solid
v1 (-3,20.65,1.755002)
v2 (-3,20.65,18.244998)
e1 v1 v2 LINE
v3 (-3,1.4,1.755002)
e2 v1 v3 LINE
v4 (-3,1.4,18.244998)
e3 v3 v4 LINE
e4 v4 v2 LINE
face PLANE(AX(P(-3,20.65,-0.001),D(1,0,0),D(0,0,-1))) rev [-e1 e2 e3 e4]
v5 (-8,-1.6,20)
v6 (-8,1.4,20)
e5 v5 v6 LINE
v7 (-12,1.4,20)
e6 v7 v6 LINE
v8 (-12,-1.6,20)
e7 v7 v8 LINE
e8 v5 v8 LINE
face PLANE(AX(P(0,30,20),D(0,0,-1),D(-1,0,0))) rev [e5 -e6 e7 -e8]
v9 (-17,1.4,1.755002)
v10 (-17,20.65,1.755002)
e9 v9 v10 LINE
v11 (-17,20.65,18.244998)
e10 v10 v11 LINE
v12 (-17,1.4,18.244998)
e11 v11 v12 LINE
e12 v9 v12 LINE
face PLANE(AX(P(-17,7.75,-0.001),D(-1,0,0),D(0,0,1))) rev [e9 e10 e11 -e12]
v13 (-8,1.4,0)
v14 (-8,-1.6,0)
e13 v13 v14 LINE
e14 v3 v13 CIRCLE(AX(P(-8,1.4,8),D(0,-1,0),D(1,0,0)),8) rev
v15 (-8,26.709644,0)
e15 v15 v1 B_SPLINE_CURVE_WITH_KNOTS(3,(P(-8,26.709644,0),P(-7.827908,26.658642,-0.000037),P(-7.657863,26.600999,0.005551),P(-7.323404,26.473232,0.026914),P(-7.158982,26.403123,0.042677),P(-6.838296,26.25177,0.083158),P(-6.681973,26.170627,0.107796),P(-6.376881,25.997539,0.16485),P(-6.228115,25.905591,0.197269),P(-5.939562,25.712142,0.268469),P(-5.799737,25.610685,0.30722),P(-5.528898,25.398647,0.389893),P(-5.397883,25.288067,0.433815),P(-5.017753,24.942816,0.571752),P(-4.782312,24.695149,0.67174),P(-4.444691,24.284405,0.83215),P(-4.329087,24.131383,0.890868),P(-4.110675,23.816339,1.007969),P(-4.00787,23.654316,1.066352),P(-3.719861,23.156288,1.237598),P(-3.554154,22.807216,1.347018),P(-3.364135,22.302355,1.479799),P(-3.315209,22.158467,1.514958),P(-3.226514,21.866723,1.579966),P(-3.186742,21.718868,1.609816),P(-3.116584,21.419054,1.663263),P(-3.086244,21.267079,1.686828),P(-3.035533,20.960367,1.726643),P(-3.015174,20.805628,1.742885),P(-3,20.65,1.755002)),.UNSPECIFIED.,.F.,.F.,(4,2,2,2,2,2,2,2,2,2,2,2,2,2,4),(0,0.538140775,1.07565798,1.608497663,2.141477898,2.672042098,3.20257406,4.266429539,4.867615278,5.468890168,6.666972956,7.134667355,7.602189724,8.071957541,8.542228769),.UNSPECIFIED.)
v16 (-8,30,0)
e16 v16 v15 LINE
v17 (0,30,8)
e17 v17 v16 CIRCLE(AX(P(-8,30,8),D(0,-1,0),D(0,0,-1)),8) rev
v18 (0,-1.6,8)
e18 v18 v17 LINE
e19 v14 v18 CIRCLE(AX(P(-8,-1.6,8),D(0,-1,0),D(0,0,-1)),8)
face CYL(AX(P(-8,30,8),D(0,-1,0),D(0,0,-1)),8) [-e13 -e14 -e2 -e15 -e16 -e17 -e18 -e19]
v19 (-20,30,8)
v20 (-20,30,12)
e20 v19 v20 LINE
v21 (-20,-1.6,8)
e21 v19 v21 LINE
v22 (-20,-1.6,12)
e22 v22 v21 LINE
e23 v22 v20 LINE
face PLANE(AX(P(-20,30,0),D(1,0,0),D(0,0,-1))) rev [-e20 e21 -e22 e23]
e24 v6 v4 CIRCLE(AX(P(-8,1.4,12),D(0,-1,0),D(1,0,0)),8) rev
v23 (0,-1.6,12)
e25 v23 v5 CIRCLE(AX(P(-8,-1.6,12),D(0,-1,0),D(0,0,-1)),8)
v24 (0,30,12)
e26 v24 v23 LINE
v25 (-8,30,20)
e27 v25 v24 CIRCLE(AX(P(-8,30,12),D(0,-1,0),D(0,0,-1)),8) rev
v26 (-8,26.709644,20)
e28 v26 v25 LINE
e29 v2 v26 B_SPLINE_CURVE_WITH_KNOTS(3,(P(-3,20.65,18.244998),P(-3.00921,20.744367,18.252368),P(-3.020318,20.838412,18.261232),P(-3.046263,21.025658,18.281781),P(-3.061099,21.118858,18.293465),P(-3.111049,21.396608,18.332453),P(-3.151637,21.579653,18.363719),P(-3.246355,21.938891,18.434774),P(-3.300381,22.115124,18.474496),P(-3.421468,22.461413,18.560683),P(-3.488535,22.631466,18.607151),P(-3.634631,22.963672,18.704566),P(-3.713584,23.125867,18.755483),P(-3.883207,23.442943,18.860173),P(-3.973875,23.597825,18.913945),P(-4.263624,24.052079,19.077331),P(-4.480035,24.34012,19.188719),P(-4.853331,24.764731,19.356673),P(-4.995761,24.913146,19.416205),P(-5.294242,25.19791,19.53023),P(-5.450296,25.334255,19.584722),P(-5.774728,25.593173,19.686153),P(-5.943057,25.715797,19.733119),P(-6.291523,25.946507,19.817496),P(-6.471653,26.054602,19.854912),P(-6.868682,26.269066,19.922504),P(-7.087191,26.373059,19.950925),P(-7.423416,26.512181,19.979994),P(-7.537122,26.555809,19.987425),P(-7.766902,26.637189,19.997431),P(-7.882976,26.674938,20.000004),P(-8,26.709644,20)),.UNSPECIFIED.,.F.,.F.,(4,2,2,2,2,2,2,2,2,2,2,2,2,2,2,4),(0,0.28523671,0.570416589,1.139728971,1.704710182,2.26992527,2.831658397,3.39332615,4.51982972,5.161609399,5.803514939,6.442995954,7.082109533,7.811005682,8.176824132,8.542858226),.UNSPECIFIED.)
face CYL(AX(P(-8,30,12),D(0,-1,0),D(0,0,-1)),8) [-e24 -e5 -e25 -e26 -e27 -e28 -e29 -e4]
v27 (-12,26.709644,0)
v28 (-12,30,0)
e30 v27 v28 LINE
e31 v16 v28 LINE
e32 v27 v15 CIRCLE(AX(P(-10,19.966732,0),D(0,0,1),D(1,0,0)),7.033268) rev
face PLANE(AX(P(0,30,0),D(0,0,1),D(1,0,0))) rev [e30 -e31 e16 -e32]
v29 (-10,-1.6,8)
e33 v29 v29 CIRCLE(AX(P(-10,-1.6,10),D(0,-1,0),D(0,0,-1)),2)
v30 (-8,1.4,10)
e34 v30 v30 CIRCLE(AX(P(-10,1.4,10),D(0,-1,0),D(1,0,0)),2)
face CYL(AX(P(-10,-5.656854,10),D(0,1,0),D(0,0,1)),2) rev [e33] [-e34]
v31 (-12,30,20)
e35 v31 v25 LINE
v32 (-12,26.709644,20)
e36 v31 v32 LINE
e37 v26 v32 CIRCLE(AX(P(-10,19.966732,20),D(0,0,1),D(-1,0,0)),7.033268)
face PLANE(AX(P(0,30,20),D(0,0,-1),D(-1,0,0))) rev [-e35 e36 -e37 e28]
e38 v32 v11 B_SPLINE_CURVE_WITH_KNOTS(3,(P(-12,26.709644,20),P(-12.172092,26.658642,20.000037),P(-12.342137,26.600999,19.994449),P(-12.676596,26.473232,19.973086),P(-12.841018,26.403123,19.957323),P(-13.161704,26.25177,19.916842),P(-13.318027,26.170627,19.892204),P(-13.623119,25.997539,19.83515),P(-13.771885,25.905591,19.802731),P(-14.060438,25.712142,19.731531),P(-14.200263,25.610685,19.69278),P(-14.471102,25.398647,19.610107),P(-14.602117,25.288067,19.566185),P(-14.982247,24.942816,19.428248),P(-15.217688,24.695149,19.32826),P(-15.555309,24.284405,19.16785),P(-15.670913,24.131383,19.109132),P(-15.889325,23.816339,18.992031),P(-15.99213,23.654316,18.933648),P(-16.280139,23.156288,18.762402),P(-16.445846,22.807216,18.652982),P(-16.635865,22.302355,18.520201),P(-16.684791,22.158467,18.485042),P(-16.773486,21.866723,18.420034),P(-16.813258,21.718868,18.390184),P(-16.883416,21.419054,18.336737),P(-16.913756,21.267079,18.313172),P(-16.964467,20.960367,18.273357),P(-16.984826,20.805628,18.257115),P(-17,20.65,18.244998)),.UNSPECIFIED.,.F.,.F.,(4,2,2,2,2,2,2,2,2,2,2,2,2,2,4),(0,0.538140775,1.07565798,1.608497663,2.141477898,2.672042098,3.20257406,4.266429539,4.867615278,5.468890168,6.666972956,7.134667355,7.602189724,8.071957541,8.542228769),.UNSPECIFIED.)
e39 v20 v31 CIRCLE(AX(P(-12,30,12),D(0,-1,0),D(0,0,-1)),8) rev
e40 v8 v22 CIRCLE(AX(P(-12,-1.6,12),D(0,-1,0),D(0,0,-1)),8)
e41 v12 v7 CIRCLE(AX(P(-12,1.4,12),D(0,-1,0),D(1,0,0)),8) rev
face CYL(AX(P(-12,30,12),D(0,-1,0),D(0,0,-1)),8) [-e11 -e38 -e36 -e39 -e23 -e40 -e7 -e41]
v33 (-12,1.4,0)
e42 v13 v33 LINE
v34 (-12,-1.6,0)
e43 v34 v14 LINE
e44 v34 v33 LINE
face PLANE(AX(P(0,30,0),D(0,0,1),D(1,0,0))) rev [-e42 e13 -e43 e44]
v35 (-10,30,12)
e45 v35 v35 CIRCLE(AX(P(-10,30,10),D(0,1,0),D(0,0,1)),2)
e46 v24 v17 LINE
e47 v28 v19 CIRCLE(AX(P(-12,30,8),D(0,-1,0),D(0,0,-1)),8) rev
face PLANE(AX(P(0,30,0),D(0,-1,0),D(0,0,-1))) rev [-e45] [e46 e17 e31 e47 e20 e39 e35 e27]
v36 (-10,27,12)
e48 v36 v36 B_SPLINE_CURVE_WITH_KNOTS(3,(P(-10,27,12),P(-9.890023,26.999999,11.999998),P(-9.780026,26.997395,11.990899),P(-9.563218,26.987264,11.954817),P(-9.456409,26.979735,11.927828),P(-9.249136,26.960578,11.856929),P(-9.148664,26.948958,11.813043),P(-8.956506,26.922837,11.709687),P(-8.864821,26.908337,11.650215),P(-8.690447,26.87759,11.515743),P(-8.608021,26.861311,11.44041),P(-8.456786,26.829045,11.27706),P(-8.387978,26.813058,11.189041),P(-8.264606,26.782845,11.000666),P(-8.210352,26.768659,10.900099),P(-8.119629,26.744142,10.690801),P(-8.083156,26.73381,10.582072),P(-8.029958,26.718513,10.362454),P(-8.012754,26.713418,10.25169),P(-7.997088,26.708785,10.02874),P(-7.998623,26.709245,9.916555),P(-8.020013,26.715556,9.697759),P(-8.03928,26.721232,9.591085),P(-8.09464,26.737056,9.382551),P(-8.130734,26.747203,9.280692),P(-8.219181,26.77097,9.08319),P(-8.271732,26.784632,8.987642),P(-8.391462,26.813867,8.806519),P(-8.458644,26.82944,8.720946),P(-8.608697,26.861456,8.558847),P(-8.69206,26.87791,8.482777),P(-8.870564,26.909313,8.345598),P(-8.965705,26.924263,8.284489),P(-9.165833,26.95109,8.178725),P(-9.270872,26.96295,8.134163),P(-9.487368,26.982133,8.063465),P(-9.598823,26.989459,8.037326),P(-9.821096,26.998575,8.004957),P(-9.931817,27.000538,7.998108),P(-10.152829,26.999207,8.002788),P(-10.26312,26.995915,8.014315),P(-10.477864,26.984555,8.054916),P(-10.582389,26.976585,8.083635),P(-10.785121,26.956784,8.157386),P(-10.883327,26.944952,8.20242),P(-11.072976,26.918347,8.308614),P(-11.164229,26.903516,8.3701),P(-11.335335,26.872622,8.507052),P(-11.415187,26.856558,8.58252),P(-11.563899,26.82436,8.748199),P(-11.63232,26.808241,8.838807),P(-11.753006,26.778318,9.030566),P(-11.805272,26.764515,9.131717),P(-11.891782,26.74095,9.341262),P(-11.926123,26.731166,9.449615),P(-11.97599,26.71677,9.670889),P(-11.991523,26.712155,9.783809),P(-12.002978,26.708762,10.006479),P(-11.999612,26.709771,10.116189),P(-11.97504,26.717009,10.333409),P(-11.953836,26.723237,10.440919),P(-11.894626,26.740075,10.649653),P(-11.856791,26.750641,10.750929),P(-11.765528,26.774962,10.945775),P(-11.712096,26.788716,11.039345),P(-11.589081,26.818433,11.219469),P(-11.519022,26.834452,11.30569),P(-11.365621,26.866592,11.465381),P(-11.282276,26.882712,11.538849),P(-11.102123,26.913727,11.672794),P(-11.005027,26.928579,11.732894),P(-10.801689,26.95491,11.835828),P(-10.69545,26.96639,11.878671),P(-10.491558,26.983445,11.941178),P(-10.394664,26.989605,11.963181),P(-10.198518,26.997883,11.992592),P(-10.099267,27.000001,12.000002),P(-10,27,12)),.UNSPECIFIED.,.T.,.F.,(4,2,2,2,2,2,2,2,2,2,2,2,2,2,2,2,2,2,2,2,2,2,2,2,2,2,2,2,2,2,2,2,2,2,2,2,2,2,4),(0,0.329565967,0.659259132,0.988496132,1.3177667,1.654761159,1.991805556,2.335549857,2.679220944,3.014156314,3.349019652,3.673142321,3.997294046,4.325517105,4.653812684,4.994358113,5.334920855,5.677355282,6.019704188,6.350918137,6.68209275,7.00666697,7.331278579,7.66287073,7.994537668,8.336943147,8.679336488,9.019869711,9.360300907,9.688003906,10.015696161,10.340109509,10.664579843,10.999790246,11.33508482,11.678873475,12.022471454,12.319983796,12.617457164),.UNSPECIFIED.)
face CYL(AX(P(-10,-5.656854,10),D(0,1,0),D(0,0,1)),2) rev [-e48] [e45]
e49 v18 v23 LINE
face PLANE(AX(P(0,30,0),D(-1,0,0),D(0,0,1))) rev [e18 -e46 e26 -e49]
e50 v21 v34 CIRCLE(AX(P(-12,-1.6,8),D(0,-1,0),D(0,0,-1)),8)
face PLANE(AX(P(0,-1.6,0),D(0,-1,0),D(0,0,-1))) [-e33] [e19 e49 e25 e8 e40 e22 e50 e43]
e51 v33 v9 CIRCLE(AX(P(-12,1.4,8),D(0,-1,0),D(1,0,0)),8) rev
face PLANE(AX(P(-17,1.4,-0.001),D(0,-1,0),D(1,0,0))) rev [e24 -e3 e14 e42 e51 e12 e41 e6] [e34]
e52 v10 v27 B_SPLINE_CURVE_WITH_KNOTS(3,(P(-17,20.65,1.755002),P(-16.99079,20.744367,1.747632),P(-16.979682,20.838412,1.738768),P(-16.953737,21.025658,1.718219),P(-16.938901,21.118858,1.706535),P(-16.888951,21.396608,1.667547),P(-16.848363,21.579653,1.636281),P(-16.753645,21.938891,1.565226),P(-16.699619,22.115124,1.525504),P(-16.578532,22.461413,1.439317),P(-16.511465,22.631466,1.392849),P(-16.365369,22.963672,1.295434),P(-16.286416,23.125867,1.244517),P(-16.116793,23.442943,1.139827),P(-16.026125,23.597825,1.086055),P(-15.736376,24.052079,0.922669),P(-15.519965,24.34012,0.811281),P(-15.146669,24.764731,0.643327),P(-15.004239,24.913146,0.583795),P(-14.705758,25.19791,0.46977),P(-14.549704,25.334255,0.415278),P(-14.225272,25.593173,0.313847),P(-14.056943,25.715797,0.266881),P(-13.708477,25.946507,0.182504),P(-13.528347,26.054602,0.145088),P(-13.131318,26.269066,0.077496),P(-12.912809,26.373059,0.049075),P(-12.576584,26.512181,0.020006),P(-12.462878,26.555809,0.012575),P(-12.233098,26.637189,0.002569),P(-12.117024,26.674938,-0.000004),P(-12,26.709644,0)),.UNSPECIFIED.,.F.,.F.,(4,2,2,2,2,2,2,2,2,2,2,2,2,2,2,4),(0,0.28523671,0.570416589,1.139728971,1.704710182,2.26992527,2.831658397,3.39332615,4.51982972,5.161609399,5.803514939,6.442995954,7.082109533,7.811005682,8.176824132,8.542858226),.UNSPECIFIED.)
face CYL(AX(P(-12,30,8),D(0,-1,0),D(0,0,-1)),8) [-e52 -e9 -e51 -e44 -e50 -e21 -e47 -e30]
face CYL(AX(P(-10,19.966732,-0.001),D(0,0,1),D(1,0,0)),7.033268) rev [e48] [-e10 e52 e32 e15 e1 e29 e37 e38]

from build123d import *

# Parameters (mm, degrees)
CROQUIS1_W              = 20
CROQUIS1_H              = 20
SALIENTE_EXTRUIR1_DEPTH = 30
CROQUIS3_R              = 6.35
CORTAR_EXTRUIR1_DEPTH   = 18
CORTAR_EXTRUIR2_REACH   = 43.231
CROQUIS4_R              = 2
CROQUIS7_W              = 20
CROQUIS7_H              = 20
CROQUIS7_R              = 2
SALIENTE_EXTRUIR3_DEPTH = 1.6
CORTAR_EXTRUIR3_REACH   = 43.231
REDONDEO1_R             = 8


with BuildPart() as part:
    # Croquis1 → Saliente-Extruir1 (new body)
    with BuildSketch(Plane(origin=(0, 0, 0), x_dir=(1, 0, 0), z_dir=(0, 1, 0))):
        with Locations((-10, -10)):
            Rectangle(CROQUIS1_W, CROQUIS1_H)
    extrude(amount=SALIENTE_EXTRUIR1_DEPTH)

    # Croquis3 → Cortar-Extruir1 (cut)
    with BuildSketch(Plane.XY.offset(20)):
        with Locations((-10, 13.75)):
            Circle(CROQUIS3_R)
    extrude(amount=-CORTAR_EXTRUIR1_DEPTH, mode=Mode.SUBTRACT)

    # Cortar-Extruir2: up to this face of the body (flat: up to its plane)
    cortar_extruir2_end = Plane(part.part.faces().sort_by_distance((-10, 0, 10))[0])
    # Croquis4 → Cortar-Extruir2 (cut, up to the picked face)
    with BuildSketch(Plane(origin=(0, 30, 0), x_dir=(1, 0, 0), z_dir=(0, 1, 0)), mode=Mode.PRIVATE) as cortar_extruir2_sk1:
        with Locations(Location((-10, -10, 0), (0, 0, 270))):
            Circle(CROQUIS4_R)
    cortar_extruir2_tool1 = split(extrude(cortar_extruir2_sk1.sketch, amount=-CORTAR_EXTRUIR2_REACH, mode=Mode.PRIVATE), bisect_by=cortar_extruir2_end, keep=Keep.BOTH, mode=Mode.PRIVATE)
    add(cortar_extruir2_tool1.solids().sort_by(Axis((-10, 30, 10), (0, -1, 0)))[0], mode=Mode.SUBTRACT)

    # Croquis7 → Saliente-Extruir3 (add)
    with BuildSketch(Plane.XZ):
        with Locations((-10, 10)):
            Rectangle(CROQUIS7_W, CROQUIS7_H)
        with Locations(Location((-10, 10, 0), (0, 0, 90))):
            Circle(CROQUIS7_R, mode=Mode.SUBTRACT)
    extrude(amount=SALIENTE_EXTRUIR3_DEPTH)

    # Croquis8 → Cortar-Extruir3 (cut, up to next)
    with BuildSketch(Plane.XY.offset(20), mode=Mode.PRIVATE) as cortar_extruir3_sk1:
        with BuildLine():
            Line((-17, 7.75), (-17, 1.4))
            Line((-17, 1.4), (-3, 1.4))
            Line((-3, 1.4), (-3, 7.75))
            Line((-3, 7.75), (-3, 20.65))
            ThreePointArc((-3, 20.65), (-10, 27), (-17, 20.65))
            Line((-17, 20.65), (-17, 7.75))
        make_face()
    cortar_extruir3_tool1 = extrude(cortar_extruir3_sk1.sketch, amount=-CORTAR_EXTRUIR3_REACH, mode=Mode.PRIVATE) & part.part
    add(cortar_extruir3_tool1.solids().sort_by_distance((-10, 13.506159, 20))[0], mode=Mode.SUBTRACT)

    # Redondeo1
    # the kernel refuses this fillet: 8 mm, written as the material it takes off along each edge
    with BuildSketch(Plane(origin=(-20, -21.6, 0), x_dir=(1, 0, 0), z_dir=(0, 1, 0)), Plane(origin=(0, 50, 0), x_dir=(-1, 0, 0), z_dir=(0, -1, 0)), Plane(origin=(-20, -21.6, 20), x_dir=(0, 0, -1), z_dir=(0, 1, 0)), Plane(origin=(0, 50, 20), x_dir=(0, 0, -1), z_dir=(0, -1, 0))) as redondeo1_piece_1:
        with BuildLine():
            CenterArc((REDONDEO1_R, -REDONDEO1_R), REDONDEO1_R, 90, 90)
            Line((0, -REDONDEO1_R), (0, 0))
            Line((0, 0), (REDONDEO1_R, 0))
        make_face()
    extrude(amount=71.6, mode=Mode.SUBTRACT)


solid = part.part
